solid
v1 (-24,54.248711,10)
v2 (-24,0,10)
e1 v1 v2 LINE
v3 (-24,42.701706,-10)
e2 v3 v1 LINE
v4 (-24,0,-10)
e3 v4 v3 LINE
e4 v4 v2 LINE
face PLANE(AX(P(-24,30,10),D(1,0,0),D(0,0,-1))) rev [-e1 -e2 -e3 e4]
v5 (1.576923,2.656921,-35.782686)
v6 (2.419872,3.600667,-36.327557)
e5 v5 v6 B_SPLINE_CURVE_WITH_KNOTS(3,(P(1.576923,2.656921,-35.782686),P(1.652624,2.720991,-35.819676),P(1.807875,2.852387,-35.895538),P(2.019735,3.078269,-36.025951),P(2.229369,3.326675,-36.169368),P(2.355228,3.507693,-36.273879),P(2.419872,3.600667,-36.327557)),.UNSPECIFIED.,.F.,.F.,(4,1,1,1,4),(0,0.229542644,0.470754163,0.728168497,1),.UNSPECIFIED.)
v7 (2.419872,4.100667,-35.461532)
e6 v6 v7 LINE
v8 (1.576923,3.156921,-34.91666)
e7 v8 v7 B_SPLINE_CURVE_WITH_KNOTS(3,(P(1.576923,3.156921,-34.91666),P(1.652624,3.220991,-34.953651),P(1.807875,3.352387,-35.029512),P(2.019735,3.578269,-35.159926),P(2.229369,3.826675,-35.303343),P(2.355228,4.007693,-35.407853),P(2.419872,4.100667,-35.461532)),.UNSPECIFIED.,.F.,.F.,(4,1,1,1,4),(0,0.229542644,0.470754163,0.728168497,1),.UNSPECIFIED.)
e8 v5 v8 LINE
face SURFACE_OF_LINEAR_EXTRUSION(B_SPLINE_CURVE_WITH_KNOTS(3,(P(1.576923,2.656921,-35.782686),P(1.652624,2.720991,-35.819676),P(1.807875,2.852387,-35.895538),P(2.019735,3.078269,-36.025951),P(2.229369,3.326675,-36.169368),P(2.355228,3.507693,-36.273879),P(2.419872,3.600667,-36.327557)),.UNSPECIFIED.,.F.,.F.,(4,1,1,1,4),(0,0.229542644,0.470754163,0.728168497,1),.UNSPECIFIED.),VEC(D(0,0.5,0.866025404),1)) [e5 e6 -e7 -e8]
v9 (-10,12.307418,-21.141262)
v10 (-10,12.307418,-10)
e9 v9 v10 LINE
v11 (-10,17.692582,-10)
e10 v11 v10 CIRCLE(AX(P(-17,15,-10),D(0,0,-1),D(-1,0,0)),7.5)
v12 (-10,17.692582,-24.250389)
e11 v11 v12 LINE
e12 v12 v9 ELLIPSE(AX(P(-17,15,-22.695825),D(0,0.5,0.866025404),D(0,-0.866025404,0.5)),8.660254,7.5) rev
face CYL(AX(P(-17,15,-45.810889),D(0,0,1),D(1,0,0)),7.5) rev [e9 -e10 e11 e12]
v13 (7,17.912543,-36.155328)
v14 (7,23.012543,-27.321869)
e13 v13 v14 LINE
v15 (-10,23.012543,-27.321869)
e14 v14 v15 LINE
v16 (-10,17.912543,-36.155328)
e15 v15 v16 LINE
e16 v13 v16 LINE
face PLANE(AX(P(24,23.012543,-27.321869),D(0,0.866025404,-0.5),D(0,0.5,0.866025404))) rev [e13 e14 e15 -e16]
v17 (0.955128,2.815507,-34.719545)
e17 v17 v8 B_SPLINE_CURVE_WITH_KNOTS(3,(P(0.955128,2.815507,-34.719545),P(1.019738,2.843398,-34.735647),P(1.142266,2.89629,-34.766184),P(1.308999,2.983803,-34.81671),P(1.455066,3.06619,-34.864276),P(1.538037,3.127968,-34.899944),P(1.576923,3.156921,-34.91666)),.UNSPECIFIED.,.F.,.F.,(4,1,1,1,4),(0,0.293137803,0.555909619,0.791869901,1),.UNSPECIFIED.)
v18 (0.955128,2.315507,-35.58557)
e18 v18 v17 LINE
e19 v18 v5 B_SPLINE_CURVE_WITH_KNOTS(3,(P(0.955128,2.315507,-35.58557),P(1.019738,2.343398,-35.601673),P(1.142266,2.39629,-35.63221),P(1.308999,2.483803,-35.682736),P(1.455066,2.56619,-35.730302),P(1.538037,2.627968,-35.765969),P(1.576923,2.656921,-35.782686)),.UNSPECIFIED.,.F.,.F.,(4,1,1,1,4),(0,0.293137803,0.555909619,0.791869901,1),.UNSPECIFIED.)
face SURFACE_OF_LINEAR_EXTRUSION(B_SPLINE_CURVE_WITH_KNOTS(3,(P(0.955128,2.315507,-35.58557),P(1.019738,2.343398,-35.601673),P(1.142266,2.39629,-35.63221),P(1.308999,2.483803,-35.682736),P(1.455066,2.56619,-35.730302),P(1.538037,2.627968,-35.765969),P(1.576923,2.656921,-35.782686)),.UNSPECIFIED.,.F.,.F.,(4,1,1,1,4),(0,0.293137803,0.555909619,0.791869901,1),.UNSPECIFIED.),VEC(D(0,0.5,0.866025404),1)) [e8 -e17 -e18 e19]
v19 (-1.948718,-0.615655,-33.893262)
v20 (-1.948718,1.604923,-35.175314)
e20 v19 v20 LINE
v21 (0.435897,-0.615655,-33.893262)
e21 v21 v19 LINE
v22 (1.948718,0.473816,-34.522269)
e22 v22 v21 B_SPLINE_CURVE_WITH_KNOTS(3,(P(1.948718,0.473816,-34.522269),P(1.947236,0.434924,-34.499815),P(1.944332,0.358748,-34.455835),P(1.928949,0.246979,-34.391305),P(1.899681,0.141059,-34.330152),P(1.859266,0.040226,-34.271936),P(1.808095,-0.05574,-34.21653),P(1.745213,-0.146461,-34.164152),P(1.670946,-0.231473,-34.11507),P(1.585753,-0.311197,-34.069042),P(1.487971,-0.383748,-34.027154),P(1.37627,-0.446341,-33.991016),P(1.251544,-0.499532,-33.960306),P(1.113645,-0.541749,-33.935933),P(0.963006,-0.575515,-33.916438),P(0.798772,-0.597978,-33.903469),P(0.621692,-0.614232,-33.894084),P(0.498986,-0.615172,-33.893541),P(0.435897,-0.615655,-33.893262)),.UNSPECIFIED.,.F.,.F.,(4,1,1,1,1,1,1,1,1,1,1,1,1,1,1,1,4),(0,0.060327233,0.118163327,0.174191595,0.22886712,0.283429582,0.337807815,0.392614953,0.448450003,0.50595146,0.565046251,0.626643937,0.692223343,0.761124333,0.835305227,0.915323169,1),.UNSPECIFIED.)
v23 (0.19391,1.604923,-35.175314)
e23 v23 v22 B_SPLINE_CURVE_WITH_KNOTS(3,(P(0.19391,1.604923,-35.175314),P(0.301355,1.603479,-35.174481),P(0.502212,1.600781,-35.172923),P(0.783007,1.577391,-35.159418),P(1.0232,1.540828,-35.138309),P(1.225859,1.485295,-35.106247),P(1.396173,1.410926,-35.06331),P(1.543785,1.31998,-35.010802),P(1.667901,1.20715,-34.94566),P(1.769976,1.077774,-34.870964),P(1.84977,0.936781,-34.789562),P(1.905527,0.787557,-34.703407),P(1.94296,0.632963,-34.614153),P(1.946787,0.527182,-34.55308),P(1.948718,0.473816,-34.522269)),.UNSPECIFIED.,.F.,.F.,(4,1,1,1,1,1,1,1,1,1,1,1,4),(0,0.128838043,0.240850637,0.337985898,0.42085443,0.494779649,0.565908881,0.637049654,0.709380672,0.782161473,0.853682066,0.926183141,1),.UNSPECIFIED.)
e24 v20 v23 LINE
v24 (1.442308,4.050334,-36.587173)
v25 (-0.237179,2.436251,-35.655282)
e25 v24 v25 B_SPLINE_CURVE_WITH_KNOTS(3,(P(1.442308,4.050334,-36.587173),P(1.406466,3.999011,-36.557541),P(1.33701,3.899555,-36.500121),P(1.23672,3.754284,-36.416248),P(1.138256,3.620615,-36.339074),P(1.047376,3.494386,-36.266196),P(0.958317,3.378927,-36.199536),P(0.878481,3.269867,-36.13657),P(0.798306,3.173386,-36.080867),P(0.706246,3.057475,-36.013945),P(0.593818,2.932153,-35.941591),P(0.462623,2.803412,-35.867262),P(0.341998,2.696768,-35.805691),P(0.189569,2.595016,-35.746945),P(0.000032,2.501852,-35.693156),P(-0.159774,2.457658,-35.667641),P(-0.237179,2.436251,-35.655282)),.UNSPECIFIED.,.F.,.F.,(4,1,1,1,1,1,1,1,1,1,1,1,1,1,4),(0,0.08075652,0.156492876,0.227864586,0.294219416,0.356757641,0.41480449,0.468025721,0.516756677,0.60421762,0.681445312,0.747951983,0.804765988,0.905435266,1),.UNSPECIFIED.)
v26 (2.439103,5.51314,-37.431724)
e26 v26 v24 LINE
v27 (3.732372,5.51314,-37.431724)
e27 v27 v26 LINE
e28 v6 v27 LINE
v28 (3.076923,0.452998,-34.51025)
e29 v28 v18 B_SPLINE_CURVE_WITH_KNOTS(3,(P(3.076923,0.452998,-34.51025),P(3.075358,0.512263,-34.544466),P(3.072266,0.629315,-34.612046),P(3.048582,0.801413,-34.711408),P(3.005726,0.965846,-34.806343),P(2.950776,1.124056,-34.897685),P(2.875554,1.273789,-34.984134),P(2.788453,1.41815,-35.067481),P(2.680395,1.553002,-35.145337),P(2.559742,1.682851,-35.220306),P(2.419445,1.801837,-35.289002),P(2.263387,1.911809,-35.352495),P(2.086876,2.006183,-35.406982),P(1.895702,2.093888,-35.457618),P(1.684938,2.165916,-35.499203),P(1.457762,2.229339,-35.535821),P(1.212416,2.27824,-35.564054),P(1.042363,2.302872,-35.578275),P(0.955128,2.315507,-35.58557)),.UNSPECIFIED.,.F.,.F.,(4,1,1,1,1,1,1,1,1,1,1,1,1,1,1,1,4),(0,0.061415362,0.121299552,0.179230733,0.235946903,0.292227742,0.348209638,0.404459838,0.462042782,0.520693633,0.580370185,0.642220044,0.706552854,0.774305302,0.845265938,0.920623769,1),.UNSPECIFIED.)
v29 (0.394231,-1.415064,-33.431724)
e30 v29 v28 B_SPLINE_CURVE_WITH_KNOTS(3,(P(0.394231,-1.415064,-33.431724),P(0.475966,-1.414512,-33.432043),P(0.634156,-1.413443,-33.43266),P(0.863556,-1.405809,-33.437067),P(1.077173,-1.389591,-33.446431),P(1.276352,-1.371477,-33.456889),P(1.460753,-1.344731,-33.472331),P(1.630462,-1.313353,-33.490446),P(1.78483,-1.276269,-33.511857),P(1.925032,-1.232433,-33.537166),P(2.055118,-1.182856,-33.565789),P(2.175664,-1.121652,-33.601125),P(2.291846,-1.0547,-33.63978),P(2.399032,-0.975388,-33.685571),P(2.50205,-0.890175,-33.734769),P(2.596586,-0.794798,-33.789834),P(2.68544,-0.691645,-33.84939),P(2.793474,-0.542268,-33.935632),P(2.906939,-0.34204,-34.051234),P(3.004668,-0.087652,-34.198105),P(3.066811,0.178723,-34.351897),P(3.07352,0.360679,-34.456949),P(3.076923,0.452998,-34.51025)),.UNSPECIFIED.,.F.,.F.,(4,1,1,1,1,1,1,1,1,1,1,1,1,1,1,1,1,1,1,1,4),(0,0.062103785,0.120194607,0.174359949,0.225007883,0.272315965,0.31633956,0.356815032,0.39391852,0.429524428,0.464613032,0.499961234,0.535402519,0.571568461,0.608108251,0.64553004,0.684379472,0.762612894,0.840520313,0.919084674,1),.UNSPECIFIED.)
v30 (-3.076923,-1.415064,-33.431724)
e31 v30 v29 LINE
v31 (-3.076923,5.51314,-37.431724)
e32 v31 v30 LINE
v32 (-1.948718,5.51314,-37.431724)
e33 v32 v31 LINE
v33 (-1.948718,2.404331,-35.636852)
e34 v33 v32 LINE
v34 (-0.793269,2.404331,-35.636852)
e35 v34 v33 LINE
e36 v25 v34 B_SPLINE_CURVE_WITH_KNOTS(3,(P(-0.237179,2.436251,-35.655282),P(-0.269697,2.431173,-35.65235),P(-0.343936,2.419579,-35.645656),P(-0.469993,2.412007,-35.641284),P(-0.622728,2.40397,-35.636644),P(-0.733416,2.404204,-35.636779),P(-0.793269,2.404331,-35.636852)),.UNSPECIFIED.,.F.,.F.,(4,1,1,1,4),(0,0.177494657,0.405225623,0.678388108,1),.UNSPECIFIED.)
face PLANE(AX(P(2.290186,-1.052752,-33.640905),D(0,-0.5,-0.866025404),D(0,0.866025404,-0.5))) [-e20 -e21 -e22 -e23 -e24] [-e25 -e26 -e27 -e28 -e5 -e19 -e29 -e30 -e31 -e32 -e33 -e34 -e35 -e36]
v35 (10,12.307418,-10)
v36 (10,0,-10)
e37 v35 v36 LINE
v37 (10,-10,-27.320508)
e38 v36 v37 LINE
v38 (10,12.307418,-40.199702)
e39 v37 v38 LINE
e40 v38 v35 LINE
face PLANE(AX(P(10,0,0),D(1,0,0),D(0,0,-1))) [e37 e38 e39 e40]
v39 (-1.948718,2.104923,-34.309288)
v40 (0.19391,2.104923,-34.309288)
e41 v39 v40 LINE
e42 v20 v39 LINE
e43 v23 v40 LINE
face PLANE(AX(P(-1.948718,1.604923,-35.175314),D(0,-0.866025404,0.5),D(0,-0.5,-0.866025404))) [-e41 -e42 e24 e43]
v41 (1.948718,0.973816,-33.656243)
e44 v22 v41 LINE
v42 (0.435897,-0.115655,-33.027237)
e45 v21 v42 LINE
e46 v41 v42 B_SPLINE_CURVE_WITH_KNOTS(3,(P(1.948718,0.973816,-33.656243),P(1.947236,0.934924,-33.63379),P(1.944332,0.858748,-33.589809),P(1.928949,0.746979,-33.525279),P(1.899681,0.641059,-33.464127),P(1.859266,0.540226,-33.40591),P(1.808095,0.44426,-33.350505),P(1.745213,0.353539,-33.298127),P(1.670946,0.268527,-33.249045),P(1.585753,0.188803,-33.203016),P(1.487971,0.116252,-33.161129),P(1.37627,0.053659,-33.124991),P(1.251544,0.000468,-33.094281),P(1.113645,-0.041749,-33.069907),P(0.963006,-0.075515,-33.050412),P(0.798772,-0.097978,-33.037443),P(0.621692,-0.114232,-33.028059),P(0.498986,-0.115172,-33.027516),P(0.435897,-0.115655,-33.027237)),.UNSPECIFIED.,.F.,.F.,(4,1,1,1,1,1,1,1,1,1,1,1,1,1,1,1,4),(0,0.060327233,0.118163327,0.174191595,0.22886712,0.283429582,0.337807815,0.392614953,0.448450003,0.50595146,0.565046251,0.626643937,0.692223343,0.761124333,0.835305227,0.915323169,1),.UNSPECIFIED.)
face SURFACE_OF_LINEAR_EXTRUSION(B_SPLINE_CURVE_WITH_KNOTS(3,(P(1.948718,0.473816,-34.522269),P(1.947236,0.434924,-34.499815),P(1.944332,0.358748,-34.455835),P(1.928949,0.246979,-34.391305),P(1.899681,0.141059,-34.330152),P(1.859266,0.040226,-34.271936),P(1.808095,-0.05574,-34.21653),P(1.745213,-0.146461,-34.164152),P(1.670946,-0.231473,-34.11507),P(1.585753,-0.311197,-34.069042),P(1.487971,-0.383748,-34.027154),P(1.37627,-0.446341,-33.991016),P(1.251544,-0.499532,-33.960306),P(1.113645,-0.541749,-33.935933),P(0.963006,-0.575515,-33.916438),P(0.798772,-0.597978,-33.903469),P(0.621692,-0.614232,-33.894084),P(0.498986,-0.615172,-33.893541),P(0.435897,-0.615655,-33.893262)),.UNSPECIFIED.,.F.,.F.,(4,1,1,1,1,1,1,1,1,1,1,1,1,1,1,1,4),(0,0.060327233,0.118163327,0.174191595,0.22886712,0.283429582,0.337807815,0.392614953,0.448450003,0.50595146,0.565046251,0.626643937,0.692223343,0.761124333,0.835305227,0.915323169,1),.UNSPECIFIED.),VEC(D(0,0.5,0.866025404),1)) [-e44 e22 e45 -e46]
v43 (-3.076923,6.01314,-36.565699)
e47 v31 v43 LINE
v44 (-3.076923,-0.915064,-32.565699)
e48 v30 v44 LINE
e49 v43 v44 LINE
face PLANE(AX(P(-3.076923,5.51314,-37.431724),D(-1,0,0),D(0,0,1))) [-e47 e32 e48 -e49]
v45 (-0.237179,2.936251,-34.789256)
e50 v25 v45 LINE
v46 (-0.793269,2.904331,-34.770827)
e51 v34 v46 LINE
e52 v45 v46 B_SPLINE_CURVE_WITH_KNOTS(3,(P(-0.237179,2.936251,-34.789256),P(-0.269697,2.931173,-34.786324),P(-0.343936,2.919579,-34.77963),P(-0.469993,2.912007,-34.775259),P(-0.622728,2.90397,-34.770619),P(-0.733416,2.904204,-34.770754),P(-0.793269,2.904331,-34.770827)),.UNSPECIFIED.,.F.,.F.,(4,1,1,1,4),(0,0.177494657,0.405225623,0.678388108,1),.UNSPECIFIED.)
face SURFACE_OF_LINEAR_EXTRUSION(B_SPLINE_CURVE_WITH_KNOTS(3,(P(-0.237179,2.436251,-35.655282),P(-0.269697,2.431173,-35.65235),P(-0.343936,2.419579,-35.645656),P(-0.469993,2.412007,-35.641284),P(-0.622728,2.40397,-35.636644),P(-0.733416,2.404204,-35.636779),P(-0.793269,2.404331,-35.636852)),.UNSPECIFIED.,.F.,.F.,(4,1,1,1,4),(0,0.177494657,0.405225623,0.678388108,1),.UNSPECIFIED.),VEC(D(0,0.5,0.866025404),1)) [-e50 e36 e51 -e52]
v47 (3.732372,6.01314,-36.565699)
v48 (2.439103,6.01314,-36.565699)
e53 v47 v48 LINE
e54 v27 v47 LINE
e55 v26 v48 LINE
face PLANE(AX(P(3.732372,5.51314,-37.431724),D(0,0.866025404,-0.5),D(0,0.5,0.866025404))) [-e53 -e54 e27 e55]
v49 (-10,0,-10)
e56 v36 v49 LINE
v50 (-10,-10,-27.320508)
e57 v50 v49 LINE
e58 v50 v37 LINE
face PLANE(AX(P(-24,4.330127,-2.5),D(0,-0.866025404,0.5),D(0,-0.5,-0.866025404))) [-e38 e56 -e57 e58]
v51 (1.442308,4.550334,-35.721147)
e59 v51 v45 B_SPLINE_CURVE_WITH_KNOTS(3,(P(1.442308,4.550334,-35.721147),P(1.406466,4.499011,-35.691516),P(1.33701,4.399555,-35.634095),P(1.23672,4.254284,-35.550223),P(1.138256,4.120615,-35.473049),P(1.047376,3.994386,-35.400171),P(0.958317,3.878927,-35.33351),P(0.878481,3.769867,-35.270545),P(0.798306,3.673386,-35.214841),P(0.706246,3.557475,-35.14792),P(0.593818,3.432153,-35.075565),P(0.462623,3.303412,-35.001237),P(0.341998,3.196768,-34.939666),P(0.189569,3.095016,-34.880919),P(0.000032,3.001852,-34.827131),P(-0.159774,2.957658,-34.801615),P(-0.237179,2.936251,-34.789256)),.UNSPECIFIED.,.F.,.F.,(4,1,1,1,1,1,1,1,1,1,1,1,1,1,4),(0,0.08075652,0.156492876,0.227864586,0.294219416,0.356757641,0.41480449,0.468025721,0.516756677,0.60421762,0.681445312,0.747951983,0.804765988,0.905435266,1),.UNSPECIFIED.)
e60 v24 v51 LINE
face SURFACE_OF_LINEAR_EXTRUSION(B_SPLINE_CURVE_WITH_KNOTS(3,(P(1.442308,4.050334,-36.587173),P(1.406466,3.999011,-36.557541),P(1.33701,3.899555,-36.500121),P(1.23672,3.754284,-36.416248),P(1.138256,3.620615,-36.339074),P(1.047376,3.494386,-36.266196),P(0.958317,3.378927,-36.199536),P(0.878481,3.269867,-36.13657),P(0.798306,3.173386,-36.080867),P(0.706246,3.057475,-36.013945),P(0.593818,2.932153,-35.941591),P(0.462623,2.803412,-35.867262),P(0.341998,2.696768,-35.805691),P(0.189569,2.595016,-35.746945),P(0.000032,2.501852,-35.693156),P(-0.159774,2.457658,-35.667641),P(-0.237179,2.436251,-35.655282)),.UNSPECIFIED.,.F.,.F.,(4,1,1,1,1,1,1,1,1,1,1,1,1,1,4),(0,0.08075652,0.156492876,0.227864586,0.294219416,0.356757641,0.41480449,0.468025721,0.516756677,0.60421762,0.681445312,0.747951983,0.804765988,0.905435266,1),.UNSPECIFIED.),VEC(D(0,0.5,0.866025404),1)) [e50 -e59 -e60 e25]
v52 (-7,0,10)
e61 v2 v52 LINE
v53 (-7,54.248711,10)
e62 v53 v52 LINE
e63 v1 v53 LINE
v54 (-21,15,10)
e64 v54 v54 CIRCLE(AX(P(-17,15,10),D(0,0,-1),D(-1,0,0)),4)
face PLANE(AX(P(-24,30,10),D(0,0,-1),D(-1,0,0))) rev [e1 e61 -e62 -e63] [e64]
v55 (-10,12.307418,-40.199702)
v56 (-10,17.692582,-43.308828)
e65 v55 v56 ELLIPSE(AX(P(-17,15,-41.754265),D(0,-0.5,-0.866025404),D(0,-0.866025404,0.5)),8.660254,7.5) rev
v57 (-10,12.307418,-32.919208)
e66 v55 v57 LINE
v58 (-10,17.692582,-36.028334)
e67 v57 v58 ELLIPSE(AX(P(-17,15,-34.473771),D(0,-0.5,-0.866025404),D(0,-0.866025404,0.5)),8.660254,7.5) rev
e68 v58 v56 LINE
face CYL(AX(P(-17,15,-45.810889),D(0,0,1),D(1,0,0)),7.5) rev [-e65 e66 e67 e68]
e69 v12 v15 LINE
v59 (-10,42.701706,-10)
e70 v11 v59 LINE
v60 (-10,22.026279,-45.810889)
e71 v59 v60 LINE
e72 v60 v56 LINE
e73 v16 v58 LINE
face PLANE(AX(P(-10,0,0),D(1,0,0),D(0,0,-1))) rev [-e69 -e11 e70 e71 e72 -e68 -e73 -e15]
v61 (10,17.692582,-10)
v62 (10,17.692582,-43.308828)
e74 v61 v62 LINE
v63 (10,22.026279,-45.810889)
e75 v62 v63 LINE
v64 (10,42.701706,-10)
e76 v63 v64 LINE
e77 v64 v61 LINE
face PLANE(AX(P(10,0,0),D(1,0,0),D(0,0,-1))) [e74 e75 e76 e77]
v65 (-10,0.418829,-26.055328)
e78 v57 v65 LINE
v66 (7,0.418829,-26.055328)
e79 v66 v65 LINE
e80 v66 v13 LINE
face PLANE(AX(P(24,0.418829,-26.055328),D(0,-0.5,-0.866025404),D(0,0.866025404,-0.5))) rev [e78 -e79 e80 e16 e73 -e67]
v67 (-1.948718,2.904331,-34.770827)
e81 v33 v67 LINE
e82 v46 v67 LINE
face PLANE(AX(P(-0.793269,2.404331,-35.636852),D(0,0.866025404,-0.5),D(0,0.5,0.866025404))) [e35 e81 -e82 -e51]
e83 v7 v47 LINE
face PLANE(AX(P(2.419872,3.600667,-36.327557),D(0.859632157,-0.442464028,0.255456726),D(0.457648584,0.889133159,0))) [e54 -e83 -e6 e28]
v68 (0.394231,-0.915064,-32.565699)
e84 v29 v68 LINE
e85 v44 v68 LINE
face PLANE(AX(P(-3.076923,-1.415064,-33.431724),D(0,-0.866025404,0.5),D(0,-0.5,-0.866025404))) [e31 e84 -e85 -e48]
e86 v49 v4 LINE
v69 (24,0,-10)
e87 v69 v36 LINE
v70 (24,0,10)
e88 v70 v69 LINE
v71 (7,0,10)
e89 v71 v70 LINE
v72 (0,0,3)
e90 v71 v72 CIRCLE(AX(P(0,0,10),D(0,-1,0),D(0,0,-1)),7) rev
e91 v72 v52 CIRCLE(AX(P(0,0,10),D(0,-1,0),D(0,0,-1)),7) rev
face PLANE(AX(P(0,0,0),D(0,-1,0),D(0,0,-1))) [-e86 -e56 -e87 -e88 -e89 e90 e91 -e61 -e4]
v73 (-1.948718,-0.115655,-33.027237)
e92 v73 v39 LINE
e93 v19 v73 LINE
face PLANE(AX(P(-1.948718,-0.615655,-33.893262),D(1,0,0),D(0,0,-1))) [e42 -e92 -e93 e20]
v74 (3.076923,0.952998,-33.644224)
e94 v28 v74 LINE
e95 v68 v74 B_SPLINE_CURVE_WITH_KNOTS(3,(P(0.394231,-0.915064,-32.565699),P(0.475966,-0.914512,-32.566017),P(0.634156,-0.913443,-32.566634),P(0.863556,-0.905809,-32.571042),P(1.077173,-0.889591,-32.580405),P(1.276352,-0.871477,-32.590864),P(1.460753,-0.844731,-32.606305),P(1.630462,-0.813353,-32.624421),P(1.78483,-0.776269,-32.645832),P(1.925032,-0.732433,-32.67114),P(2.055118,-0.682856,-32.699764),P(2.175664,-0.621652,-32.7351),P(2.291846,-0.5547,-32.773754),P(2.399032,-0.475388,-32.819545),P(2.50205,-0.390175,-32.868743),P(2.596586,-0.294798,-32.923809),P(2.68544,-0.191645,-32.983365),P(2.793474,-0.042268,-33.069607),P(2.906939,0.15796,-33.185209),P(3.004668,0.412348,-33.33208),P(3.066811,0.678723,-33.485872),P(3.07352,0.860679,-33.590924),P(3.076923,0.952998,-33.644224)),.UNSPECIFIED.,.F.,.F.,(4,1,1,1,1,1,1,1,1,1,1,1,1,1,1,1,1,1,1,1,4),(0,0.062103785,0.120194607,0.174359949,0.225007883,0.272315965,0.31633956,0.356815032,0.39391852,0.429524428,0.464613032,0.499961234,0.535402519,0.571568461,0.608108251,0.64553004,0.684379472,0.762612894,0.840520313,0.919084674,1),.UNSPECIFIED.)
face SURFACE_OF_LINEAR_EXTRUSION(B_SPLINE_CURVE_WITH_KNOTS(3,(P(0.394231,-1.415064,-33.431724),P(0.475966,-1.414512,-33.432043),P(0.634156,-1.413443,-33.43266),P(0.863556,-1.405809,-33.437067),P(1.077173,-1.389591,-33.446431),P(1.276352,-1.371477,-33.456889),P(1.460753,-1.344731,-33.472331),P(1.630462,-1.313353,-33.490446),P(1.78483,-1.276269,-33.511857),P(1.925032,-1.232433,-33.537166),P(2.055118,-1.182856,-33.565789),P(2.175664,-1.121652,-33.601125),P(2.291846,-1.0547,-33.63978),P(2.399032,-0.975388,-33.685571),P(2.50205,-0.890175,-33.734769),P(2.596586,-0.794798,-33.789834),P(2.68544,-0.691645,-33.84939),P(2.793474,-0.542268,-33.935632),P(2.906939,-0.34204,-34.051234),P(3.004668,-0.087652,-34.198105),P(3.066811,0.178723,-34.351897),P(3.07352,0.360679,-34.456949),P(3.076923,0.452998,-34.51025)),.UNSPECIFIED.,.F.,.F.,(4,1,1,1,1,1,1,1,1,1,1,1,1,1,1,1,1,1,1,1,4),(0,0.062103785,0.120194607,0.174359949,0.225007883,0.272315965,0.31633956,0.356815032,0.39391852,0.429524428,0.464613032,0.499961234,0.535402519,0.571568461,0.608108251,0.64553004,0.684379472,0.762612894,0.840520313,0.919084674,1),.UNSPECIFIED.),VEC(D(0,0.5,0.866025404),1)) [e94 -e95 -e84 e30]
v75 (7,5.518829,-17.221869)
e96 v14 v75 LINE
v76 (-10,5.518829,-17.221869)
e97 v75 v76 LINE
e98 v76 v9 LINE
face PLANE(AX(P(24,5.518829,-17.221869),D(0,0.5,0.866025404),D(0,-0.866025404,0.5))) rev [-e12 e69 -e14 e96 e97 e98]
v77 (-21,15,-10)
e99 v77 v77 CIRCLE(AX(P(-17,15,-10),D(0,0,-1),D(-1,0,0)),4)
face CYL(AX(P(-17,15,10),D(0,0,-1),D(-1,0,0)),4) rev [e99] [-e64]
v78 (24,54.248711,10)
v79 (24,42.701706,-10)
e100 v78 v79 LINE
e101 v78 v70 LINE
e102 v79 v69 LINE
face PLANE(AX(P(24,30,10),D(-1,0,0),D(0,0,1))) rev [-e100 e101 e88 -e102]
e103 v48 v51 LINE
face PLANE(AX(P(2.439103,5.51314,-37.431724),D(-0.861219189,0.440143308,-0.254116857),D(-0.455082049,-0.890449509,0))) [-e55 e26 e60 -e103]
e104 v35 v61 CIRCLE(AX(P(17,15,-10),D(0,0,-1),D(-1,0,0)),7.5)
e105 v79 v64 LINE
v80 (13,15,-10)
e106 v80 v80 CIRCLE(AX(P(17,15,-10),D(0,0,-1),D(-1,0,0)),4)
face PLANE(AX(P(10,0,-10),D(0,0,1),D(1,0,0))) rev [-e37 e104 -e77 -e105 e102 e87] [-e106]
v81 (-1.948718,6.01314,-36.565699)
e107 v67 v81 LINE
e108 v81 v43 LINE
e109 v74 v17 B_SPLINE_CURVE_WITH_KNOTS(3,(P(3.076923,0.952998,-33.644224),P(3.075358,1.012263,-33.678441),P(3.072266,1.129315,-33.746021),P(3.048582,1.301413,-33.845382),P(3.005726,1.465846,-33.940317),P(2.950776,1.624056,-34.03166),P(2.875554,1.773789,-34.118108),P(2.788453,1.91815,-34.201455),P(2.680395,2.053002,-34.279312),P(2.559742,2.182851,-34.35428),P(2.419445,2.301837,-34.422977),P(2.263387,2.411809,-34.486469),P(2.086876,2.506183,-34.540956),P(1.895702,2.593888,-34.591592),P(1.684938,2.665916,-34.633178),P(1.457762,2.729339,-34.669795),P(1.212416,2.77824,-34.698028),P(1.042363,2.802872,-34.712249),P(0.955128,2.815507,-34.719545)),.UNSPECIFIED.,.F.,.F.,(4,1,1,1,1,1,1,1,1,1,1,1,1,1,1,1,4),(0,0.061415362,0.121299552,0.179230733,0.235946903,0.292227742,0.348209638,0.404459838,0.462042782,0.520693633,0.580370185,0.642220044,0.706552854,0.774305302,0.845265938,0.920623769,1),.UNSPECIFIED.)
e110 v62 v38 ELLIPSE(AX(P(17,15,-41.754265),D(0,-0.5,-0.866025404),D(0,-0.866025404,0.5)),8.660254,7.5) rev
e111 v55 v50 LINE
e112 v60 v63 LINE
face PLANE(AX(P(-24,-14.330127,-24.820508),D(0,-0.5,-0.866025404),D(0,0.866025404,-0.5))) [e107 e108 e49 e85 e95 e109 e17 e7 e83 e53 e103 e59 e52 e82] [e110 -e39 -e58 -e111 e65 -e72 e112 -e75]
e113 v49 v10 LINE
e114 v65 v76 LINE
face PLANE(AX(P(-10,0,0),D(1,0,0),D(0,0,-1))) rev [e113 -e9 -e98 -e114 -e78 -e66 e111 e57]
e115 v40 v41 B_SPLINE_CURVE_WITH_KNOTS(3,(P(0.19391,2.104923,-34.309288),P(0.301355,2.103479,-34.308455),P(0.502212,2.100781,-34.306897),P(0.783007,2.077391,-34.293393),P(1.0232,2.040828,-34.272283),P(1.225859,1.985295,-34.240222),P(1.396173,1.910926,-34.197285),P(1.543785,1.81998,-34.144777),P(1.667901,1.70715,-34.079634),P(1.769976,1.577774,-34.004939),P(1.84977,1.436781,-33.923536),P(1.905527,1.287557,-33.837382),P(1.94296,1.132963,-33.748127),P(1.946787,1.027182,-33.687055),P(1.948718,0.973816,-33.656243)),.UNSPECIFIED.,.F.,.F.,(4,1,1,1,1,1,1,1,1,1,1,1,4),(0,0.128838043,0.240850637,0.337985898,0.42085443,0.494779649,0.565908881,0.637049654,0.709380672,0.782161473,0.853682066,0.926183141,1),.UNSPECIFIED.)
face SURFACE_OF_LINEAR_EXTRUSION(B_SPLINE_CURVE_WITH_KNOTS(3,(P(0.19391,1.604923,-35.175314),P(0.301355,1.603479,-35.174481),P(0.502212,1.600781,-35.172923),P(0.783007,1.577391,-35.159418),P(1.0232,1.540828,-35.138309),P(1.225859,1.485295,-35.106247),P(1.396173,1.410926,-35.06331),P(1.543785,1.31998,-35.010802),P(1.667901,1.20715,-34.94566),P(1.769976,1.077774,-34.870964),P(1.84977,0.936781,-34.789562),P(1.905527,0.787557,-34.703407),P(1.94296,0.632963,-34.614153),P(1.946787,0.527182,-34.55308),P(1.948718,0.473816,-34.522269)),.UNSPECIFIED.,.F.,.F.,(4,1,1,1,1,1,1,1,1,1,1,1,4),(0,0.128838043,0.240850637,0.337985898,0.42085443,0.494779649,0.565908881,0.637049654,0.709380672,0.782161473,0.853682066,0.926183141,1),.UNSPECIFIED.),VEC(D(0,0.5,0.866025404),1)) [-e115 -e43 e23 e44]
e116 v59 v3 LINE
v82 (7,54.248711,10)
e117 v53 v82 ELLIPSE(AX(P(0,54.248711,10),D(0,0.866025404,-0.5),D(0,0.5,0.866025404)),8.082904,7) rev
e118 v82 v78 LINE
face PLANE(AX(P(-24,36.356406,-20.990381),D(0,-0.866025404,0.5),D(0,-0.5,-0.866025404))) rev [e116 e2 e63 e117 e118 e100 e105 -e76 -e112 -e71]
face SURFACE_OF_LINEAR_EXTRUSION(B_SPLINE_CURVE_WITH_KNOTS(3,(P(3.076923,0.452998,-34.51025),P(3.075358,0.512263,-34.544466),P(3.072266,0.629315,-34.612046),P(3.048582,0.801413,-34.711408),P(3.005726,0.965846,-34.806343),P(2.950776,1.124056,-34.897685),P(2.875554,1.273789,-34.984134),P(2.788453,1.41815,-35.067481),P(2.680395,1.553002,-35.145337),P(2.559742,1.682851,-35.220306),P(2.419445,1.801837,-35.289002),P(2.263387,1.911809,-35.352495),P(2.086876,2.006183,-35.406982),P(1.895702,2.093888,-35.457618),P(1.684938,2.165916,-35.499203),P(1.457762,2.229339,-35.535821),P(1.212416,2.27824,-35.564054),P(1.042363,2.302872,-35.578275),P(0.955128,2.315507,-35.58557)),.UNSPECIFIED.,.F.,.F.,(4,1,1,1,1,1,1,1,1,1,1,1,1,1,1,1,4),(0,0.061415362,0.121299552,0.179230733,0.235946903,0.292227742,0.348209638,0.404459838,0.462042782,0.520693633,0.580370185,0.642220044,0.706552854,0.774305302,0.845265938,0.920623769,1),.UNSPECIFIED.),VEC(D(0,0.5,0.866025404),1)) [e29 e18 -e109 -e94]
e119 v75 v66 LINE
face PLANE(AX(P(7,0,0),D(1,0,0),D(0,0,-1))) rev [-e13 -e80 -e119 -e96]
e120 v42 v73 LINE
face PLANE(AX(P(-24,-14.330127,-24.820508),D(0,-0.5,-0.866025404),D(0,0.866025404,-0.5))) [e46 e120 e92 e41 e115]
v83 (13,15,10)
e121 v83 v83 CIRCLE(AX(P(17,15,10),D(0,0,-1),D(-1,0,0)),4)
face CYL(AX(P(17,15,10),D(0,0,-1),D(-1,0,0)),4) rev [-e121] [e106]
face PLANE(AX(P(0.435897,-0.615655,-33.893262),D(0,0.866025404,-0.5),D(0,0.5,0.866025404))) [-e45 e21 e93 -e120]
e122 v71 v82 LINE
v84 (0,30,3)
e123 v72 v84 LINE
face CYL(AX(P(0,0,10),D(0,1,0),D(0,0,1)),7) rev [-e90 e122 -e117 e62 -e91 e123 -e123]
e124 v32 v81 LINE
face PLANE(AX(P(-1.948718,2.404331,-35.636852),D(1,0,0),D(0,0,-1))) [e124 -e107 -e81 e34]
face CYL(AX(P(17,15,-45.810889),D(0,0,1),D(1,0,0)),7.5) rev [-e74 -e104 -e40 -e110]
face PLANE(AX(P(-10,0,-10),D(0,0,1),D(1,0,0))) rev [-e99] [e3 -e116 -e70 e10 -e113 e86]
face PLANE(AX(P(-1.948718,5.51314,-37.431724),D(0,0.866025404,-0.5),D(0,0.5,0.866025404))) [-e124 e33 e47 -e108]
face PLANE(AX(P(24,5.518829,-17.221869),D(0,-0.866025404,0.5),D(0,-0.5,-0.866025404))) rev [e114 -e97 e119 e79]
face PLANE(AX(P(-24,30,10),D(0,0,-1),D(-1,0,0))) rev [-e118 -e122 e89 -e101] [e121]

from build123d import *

# Parameters (mm, degrees)
SKETCH_1_W              = 48
SKETCH_1_H              = 20
EXTRUDE_1_DEPTH         = 30
SKETCH_2_W              = 14
SKETCH_2_H              = 30
CUT_EXTRUDE_1_DEPTH     = 7
EXTRUDE_2_DEPTH         = 48
CUT_EXTRUDE_2_DEPTH     = 14
CUT_EXTRUDE_3_DEPTH     = 14
CUT_EXTRUDE_4_DEPTH     = 65.456478054
SKETCH_13_R             = 4
CUT_EXTRUDE_5_DEPTH     = 53.52066051
SKETCH_14_R             = 4
CUT_EXTRUDE_6_DEPTH     = 53.52066051
FILLET_1_R              = 7
EXTRUDE_3_DEPTH         = 3
EXTRUDE_5_DEPTH         = 1
SKETCH_20_R             = 7.5
CUT_EXTRUDE_8_DEPTH     = 53.520660579
BOSS_EXTRUDE1_DEPTH     = 25
CUT_EXTRUDE1_DEPTH      = 80.244164279
CUT_EXTRUDE1_DEPTH_BACK = 80.244164279


with BuildPart() as part:
    # Эскиз1 → Бобышка-Вытянуть1 (new body)
    with BuildSketch(Plane(origin=(0, 0, 0), x_dir=(1, 0, 0), z_dir=(0, 1, 0))):
        Rectangle(SKETCH_1_W, SKETCH_1_H)
    extrude(amount=EXTRUDE_1_DEPTH)

    # Эскиз2 → Вырез-Вытянуть1 (cut)
    with BuildSketch(Plane.XY.offset(10)):
        with Locations((0, 15)):
            Rectangle(SKETCH_2_W, SKETCH_2_H)
    extrude(amount=-CUT_EXTRUDE_1_DEPTH, mode=Mode.SUBTRACT)

    # Эскиз7 → Бобышка-Вытянуть2 (add)
    with BuildSketch(Plane(origin=(24, 0, 0), x_dir=(0, 0, -1), z_dir=(1, 0, 0))):
        Polygon((10, 0), (27.320508076, -10), (45.810889132, 22.026279442), (32, 30), (10, 30), align=None)
    extrude(amount=-EXTRUDE_2_DEPTH)

    # Эскиз8 → Вырез-Вытянуть2 (cut)
    with BuildSketch(Plane(origin=(24, 0, 0), x_dir=(0, 0, -1), z_dir=(1, 0, 0))):
        Polygon((10, 0), (10, 30), (32, 30), (45.810889132, 22.026279442), (27.320508076, -10), align=None)
    extrude(amount=-CUT_EXTRUDE_2_DEPTH, mode=Mode.SUBTRACT)

    # Эскиз9 → Вырез-Вытянуть3 (cut)
    with BuildSketch(Plane.ZY.offset(24)):
        Polygon((-10, 0), (-10, 30), (-32, 30), (-45.810889132, 22.026279442), (-27.320508076, -10), align=None)
    extrude(amount=-CUT_EXTRUDE_3_DEPTH, mode=Mode.SUBTRACT)

    # Эскиз11 → Вырез-Вытянуть4 (cut, through all)
    with BuildSketch(Plane.ZY.offset(10)):
        Polygon((-17.221869062, 5.518829477), (-27.321869062, 23.012542633), (-36.15532818, 17.912542633), (-26.05532818, 0.418829477), align=None)
    extrude(amount=-CUT_EXTRUDE_4_DEPTH, mode=Mode.SUBTRACT)

    # Эскиз13 → Вырез-Вытянуть5 (cut, through all)
    with BuildSketch(Plane(origin=(0, 0, -10), x_dir=(-1, 0, 0), z_dir=(0, 0, -1))):
        with Locations((17, 15)):
            Circle(SKETCH_13_R)
    extrude(amount=-CUT_EXTRUDE_5_DEPTH, mode=Mode.SUBTRACT)

    # Эскиз14 → Вырез-Вытянуть6 (cut, through all)
    with BuildSketch(Plane(origin=(0, 0, -10), x_dir=(-1, 0, 0), z_dir=(0, 0, -1))):
        with Locations((-17, 15)):
            Circle(SKETCH_14_R)
    extrude(amount=-CUT_EXTRUDE_6_DEPTH, mode=Mode.SUBTRACT)

    # Скругление1
    fillet_1_edges = [part.edges().sort_by_distance(p)[0] for p in [
        (-7, 15, 3),
        (7, 15, 3),
    ]]
    fillet(fillet_1_edges, radius=FILLET_1_R - 0.0001)  # a hair under: the kernel refuses the full size

    # Эскиз16 → Бобышка-Вытянуть3 (add)
    with BuildSketch(Plane(origin=(10, 0, 0), x_dir=(0, 0, -1), z_dir=(1, 0, 0))):
        Polygon((27.321869062, 23.012542633), (17.221869062, 5.518829477), (26.05532818, 0.418829477), (36.15532818, 17.912542633), align=None)
    extrude(amount=-EXTRUDE_3_DEPTH)

    # Эскиз18 → Бобышка-Вытянуть5 (add)
    with BuildSketch(Plane(origin=(0, -14.330127019, -24.820508076), x_dir=(-1, 0, 0), z_dir=(0, -0.49999999999998845, -0.8660254037844453))):
        with BuildLine():
            Line((3.076923077, 23.490381057), (3.076923077, 15.490381057))
            Line((3.076923077, 15.490381057), (-0.394230769, 15.490381057))
            add(Edge.make_bspline(
                [(-0.394230769, 15.490381057), (-0.475966203, 15.49101845), (-0.634155568, 15.49225205), (-0.863556464, 15.501067061), (-1.077173272, 15.519794557), (-1.276352297, 15.540710881), (-1.460752713, 15.571594241), (-1.630462401, 15.607825992), (-1.784830485, 15.650647709), (-1.925031539, 15.701264755), (-2.055118116, 15.758511595), (-2.175664232, 15.829183977), (-2.291845901, 15.906492451), (-2.399031866, 15.998074814), (-2.502049745, 16.096470161), (-2.596586483, 16.206601733), (-2.685439891, 16.325713037), (-2.793473896, 16.498197991), (-2.906939016, 16.729401784), (-3.004668447, 17.02314385), (-3.06681146, 17.330727068), (-3.073519576, 17.5408315), (-3.076923077, 17.647432339)],
                knots=[0, 0, 0, 0, 1.242075696, 2.40389213, 3.487198984, 4.500157661, 5.446319301, 6.326791195, 7.136300648, 7.878370406, 8.590488565, 9.292260633, 9.999224673, 10.708050372, 11.431369221, 12.162165018, 12.910600795, 13.687589445, 15.252257874, 16.810406251, 18.381693487, 20, 20, 20, 20], degree=3))
            add(Edge.make_bspline(
                [(-3.076923077, 17.647432339), (-3.075357604, 17.715865612), (-3.072265688, 17.851026019), (-3.048581646, 18.049748215), (-3.005726368, 18.239618444), (-2.950775925, 18.42230348), (-2.87555432, 18.595200652), (-2.788453183, 18.761894703), (-2.680395045, 18.917607923), (-2.559742342, 19.067544403), (-2.419445088, 19.204937793), (-2.263386964, 19.331922341), (-2.086876234, 19.440896432), (-1.89570213, 19.542168691), (-1.684937787, 19.625339579), (-1.457761732, 19.698574242), (-1.21241575, 19.755040234), (-1.042362796, 19.783482773), (-0.955128205, 19.798073364)],
                knots=[0, 0, 0, 0, 0.982645791, 1.940792824, 2.867691729, 3.775150443, 4.675643875, 5.571354211, 6.471357401, 7.392684514, 8.331098131, 9.285922955, 10.275520706, 11.304845665, 12.388884831, 13.524255008, 14.729980297, 16, 16, 16, 16], degree=3))
            add(Edge.make_bspline(
                [(-0.955128205, 19.798073364), (-1.019738399, 19.830278555), (-1.14226585, 19.891352818), (-1.308999482, 19.992404668), (-1.455065559, 20.087536339), (-1.53803712, 20.158871679), (-1.576923077, 20.192304134)],
                knots=[0, 0, 0, 0, 1.172551213, 2.223638478, 3.167479604, 4, 4, 4, 4], degree=3))
            add(Edge.make_bspline(
                [(-1.576923077, 20.192304134), (-1.652624383, 20.266285408), (-1.807875296, 20.418008818), (-2.019735444, 20.678834883), (-2.229368535, 20.965668904), (-2.355227865, 21.174690137), (-2.419871795, 21.282047723)],
                knots=[0, 0, 0, 0, 0.918170575, 1.883016652, 2.912673989, 4, 4, 4, 4], degree=3))
            Line((-2.419871795, 21.282047723), (-3.732371795, 23.490381057))
            Line((-3.732371795, 23.490381057), (-2.439102564, 23.490381057))
            Line((-2.439102564, 23.490381057), (-1.442307692, 21.801278493))
            add(Edge.make_bspline(
                [(-1.442307692, 21.801278493), (-1.406465761, 21.74201577), (-1.337009983, 21.627174345), (-1.236719552, 21.459429826), (-1.138255761, 21.30508177), (-1.047376022, 21.15932531), (-0.958316878, 21.02600434), (-0.878481314, 20.900073272), (-0.798305584, 20.788666158), (-0.706246053, 20.654823189), (-0.593818414, 20.510114732), (-0.462623309, 20.361457059), (-0.34199814, 20.238315643), (-0.18956943, 20.120822362), (-3.2323e-05, 20.013245791), (0.159774488, 19.962214344), (0.237179487, 19.937496441)],
                knots=[0, 0, 0, 0, 1.130591283, 2.190900266, 3.190104209, 4.119071823, 4.994606968, 5.807262858, 6.55236009, 7.234593472, 8.459046683, 9.540234366, 10.471327768, 11.266723835, 12.676093724, 14, 14, 14, 14], degree=3))
            add(Edge.make_bspline(
                [(0.237179487, 19.937496441), (0.269697183, 19.931632396), (0.343936058, 19.918244603), (0.469993483, 19.909501015), (0.622727518, 19.900220866), (0.733416476, 19.900491258), (0.793269231, 19.900637467)],
                knots=[0, 0, 0, 0, 0.709978628, 1.620902492, 2.713552433, 4, 4, 4, 4], degree=3))
            Line((0.793269231, 19.900637467), (1.948717949, 19.900637467))
            Line((1.948717949, 19.900637467), (1.948717949, 23.490381057))
            Line((1.948717949, 23.490381057), (3.076923077, 23.490381057))
        make_face()
        with BuildLine():
            Line((1.948717949, 18.977560544), (-0.193910256, 18.977560544))
            add(Edge.make_bspline(
                [(-0.193910256, 18.977560544), (-0.301354607, 18.97589409), (-0.502211742, 18.972778811), (-0.783007271, 18.945769758), (-1.023200158, 18.903550736), (-1.225858519, 18.839427155), (-1.396173113, 18.753553027), (-1.54378517, 18.648537277), (-1.667901131, 18.51825252), (-1.769975791, 18.368861713), (-1.849770319, 18.206056724), (-1.90552669, 18.03374763), (-1.942959563, 17.855238544), (-1.946787014, 17.733092852), (-1.948717949, 17.6714708)],
                knots=[0, 0, 0, 0, 1.546056516, 2.890207646, 4.055830773, 5.050253158, 5.937355789, 6.790906573, 7.644595853, 8.512568064, 9.38593768, 10.244184789, 11.114197691, 12, 12, 12, 12], degree=3))
            add(Edge.make_bspline(
                [(-1.948717949, 17.6714708), (-1.947235583, 17.626563151), (-1.944332064, 17.538602257), (-1.928948857, 17.409542216), (-1.89968097, 17.287236957), (-1.859266003, 17.17080484), (-1.808094758, 17.059993077), (-1.745213393, 16.955237495), (-1.670946372, 16.857073145), (-1.585753391, 16.765016757), (-1.487970747, 16.681241729), (-1.376270424, 16.608965458), (-1.251544399, 16.547545272), (-1.113644587, 16.498798364), (-0.963006292, 16.459808698), (-0.798771701, 16.43387015), (-0.621691971, 16.415101097), (-0.498985984, 16.414015918), (-0.435897436, 16.41345798)],
                knots=[0, 0, 0, 0, 0.965235723, 1.89061323, 2.787065514, 3.661873922, 4.534873316, 5.404925039, 6.281839248, 7.175200054, 8.095223355, 9.040740021, 10.02630299, 11.075573487, 12.177989335, 13.364883635, 14.645170704, 16, 16, 16, 16], degree=3))
            Line((-0.435897436, 16.41345798), (1.948717949, 16.41345798))
            Line((1.948717949, 16.41345798), (1.948717949, 18.977560544))
        make_face(mode=Mode.SUBTRACT)
    extrude(amount=EXTRUDE_5_DEPTH)

    # Эскиз20 → Вырез-Вытянуть8 (cut, through all)
    with BuildSketch(Plane(origin=(0, 0, -10), x_dir=(-1, 0, 0), z_dir=(0, 0, -1))):
        with Locations((-17, 15)):
            Circle(SKETCH_20_R)
        with Locations((17, 15)):
            Circle(SKETCH_20_R)
    extrude(amount=CUT_EXTRUDE_8_DEPTH, mode=Mode.SUBTRACT)

    # Sketch3 → Boss-Extrude1 (add)
    with BuildSketch(Plane(origin=(0, 30, 0), x_dir=(1, 0, 0), z_dir=(0, 1, 0))):
        with BuildLine():
            Line((7, -10), (24, -10))
            Line((24, -10), (24, 10))
            Line((24, 10), (10, 10))
            Line((10, 10), (10, 32))
            Line((10, 32), (-10, 32))
            Line((-10, 32), (-10, 10))
            Line((-10, 10), (-24, 10))
            Line((-24, 10), (-24, -10))
            Line((-24, -10), (-7, -10))
            ThreePointArc((-7, -10), (0, -3), (7, -10))
        make_face()
    extrude(amount=BOSS_EXTRUDE1_DEPTH)

    # Sketch4 → Cut-Extrude1 (cut, two sides: drawn at the far end of the back side and taken through both)
    with BuildSketch(Plane.ZY.offset(10).offset(-CUT_EXTRUDE1_DEPTH_BACK)):
        Polygon((-251.050138586, -96.468656479), (-45.810889132, 22.026279442), (35.63071017, 69.046608722), (240.869959624, 187.541544642), (3.880087783, 598.020043549), (-488.040010426, 314.009842428), align=None)
    extrude(amount=CUT_EXTRUDE1_DEPTH + CUT_EXTRUDE1_DEPTH_BACK, mode=Mode.SUBTRACT)


solid = part.part
